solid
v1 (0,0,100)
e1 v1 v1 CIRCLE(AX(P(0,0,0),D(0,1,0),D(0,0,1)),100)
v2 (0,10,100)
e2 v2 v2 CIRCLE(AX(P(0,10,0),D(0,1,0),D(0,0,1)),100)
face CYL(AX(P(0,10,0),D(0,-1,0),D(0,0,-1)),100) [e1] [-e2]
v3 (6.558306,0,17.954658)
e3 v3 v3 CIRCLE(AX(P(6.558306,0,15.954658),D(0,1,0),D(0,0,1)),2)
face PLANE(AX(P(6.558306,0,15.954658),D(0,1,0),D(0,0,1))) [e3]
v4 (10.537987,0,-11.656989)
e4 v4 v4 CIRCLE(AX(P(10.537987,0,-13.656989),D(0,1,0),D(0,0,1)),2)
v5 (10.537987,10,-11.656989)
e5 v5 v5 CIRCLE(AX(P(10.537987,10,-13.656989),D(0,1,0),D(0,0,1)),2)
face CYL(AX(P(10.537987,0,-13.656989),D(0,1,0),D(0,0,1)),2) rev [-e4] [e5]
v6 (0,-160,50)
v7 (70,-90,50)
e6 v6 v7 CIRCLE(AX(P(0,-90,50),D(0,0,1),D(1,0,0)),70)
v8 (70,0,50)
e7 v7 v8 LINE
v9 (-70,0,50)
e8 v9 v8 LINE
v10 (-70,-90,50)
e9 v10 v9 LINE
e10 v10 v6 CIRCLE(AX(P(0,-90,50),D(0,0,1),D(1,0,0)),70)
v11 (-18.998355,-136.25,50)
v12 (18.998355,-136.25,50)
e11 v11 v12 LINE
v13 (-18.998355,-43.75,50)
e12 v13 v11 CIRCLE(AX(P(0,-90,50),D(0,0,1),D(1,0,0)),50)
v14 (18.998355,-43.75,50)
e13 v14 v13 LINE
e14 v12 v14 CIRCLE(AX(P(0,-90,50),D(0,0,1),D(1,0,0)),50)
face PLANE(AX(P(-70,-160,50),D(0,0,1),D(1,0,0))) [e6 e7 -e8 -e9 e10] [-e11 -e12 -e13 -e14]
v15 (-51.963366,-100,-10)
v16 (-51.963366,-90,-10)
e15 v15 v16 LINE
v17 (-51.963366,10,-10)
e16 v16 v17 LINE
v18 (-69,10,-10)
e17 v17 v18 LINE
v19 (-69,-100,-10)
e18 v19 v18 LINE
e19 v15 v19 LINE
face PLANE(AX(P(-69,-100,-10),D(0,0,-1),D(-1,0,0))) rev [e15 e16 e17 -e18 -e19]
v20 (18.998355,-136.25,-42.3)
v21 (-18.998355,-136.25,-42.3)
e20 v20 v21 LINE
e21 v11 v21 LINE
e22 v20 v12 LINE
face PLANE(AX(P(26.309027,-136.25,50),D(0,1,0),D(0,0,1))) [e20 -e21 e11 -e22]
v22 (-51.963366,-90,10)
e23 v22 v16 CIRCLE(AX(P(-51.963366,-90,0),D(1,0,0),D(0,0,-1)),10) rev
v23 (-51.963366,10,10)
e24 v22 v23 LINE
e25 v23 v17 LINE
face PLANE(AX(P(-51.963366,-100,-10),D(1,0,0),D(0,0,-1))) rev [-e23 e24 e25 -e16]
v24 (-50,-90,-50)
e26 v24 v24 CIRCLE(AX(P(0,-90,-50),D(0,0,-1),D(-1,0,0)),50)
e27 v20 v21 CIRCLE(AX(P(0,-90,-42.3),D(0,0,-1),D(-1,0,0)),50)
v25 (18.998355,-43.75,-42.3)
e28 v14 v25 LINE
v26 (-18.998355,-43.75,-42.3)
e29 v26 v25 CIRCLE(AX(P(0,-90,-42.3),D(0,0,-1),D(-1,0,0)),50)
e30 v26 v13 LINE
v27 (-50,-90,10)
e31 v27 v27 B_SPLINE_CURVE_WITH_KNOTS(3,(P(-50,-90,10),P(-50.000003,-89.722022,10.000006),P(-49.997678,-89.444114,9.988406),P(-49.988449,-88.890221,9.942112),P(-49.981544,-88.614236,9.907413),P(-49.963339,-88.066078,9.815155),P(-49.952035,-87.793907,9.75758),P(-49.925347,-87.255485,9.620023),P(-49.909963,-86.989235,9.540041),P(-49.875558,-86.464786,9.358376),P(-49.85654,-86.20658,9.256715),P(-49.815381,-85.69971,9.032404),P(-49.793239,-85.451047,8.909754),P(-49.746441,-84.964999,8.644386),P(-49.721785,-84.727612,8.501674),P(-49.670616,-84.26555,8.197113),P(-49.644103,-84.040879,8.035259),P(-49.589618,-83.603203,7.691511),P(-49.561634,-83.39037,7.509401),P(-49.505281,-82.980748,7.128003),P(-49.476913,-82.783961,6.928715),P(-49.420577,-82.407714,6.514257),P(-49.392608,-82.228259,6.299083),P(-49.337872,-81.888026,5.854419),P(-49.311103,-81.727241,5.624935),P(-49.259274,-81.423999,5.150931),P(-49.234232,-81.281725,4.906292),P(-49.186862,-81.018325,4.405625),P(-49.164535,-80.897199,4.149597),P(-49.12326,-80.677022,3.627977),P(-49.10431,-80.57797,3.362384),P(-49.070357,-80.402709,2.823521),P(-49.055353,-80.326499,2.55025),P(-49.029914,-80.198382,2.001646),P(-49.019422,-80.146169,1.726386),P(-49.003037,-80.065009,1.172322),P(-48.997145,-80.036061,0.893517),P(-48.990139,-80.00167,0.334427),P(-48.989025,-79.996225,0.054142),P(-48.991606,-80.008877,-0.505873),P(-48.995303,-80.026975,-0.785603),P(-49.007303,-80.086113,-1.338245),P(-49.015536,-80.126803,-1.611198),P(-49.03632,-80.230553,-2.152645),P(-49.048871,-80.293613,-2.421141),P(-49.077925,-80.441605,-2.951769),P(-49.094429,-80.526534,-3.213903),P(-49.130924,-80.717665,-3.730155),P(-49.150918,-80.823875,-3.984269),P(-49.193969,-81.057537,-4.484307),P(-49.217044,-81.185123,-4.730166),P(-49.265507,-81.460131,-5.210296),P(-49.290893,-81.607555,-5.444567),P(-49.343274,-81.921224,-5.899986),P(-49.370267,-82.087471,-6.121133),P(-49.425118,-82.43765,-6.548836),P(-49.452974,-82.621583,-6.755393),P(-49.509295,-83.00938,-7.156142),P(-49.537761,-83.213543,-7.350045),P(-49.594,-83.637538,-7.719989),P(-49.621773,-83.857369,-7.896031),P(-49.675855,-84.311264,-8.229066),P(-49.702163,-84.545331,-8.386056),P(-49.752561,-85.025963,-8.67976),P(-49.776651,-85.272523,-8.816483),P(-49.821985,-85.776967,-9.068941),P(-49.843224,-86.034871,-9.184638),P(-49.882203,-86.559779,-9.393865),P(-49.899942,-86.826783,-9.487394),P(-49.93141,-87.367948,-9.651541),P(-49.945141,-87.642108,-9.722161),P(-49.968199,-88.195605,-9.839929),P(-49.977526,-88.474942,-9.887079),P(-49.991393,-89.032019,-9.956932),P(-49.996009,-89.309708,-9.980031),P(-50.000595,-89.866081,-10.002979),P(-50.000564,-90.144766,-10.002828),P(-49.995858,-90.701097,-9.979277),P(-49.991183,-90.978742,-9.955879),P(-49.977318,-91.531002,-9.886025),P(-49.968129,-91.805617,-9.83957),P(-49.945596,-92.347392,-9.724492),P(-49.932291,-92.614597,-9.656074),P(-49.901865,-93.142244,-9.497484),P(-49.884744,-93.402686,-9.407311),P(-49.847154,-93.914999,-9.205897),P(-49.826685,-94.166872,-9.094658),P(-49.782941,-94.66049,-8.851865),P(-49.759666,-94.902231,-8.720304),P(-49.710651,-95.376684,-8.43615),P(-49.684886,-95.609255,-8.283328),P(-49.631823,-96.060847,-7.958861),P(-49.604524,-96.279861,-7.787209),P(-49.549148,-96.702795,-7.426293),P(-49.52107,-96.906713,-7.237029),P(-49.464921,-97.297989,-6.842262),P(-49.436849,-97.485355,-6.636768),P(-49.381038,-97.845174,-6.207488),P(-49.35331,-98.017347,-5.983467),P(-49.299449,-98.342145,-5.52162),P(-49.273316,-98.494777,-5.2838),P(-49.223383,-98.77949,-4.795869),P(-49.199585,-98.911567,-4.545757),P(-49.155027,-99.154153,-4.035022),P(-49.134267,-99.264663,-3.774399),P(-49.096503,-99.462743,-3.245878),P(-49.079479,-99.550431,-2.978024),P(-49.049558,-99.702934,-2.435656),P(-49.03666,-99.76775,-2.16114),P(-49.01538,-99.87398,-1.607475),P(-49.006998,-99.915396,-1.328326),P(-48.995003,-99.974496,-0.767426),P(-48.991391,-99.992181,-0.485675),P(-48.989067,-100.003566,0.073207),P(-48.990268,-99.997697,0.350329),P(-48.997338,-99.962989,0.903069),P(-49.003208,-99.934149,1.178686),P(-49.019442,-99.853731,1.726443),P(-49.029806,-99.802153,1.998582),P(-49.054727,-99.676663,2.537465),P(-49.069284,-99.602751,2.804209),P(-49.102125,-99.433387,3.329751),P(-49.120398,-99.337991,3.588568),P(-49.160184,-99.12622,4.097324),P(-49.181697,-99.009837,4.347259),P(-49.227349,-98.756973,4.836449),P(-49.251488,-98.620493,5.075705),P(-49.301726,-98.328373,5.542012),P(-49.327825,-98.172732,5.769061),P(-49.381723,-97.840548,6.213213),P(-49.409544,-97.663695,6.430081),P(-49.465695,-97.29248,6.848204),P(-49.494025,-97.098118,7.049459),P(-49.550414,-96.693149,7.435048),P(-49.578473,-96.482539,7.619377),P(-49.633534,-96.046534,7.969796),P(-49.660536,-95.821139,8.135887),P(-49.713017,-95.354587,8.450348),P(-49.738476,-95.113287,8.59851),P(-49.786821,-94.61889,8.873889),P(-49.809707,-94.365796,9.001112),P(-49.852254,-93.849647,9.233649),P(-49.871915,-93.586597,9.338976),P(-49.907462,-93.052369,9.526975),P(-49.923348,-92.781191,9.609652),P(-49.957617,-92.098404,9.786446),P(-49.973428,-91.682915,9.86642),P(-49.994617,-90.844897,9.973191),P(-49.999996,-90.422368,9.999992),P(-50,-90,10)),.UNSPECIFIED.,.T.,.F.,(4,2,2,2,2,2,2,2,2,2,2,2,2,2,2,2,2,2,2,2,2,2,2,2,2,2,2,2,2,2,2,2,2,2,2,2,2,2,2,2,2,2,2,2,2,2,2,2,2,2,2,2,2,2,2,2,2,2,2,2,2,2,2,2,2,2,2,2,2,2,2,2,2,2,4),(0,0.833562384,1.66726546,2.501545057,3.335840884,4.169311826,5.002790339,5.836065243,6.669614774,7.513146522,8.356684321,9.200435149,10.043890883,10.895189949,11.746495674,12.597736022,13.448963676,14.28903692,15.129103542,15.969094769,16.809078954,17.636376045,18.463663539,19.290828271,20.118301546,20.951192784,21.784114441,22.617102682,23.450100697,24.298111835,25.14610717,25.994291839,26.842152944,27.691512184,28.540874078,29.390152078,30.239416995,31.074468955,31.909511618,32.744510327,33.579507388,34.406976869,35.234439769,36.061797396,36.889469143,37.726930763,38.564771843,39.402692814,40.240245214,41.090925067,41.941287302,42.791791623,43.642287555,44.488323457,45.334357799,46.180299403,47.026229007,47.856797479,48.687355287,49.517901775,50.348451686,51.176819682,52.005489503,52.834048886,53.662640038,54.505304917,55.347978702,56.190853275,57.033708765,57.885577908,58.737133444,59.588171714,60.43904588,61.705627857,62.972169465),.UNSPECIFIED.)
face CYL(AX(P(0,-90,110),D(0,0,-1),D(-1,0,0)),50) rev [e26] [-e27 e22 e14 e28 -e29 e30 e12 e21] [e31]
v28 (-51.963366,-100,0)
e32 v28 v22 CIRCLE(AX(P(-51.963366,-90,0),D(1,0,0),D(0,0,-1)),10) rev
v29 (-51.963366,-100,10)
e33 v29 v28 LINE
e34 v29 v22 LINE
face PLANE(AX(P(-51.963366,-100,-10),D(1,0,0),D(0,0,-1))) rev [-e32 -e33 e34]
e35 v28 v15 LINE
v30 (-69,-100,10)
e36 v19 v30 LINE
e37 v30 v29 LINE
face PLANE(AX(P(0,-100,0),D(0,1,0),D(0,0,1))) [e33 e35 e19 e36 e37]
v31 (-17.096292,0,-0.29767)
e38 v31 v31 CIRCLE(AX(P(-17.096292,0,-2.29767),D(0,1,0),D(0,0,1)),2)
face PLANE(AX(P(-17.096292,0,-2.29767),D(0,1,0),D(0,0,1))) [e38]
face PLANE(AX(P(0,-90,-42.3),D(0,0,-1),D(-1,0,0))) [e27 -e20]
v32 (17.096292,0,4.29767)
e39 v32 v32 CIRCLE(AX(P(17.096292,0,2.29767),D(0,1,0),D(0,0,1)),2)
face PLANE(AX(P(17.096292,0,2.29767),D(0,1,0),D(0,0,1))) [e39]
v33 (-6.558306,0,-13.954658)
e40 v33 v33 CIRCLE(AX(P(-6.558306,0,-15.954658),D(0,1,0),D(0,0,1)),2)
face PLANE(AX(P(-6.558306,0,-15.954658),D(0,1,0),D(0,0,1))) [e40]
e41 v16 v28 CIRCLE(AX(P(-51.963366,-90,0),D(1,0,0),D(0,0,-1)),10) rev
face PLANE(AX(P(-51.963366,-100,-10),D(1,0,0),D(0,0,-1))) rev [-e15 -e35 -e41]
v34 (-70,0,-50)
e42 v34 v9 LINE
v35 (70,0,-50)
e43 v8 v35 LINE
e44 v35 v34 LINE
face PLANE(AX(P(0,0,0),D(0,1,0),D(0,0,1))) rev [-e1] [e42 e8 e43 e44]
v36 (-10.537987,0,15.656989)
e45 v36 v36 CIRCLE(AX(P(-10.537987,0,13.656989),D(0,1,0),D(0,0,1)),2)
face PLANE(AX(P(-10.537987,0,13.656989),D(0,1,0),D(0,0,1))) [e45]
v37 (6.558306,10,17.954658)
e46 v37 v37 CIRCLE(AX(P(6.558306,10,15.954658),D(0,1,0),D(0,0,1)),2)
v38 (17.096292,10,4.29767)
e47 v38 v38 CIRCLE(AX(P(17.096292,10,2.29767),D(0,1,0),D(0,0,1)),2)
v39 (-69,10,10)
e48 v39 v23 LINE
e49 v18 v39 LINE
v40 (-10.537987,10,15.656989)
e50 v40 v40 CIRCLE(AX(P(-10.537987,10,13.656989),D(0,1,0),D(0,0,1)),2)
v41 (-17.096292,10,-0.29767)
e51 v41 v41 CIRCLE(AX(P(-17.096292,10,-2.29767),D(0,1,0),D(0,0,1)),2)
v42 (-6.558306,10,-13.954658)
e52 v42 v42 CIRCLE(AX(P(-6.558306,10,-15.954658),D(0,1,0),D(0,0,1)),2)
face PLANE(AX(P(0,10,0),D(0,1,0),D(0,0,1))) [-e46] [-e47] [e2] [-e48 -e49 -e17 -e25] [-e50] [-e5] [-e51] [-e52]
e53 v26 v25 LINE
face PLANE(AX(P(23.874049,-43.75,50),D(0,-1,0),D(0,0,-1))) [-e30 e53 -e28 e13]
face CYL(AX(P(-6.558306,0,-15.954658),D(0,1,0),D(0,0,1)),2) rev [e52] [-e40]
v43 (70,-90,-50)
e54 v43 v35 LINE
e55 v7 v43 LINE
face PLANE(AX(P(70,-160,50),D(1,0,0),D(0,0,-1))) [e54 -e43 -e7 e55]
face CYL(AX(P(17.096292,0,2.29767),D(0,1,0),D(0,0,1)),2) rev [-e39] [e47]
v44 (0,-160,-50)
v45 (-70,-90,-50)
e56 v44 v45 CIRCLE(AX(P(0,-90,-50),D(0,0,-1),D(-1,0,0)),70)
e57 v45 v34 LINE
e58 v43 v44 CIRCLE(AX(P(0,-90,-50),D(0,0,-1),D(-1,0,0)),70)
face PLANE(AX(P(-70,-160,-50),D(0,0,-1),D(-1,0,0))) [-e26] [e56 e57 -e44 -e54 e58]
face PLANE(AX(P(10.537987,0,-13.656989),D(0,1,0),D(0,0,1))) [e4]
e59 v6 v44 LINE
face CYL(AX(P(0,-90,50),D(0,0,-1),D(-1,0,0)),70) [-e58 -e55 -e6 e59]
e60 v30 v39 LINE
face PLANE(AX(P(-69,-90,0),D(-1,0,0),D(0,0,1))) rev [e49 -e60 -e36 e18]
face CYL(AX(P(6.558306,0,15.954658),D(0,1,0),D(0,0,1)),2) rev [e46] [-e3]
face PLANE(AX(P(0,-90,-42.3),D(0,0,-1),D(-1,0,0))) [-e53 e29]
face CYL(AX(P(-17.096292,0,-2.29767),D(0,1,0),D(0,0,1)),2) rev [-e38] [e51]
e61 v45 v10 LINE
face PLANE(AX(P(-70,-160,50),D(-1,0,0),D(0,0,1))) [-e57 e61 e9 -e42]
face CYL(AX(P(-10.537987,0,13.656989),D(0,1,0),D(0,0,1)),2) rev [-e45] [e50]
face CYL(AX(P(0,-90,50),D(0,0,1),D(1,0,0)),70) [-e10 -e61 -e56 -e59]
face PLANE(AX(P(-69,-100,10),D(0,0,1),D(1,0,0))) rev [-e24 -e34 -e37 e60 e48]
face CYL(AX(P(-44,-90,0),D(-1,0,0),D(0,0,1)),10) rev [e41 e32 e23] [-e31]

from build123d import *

# Parameters (mm, degrees)
SKETCH_1_R          = 100
EXTRUDE_1_DEPTH     = 10
SKETCH_2_W          = 140
SKETCH_2_H          = 100
EXTRUDE_2_DEPTH     = 160.00000000000009
FILLET_1_R          = 70
FILLET_2_R          = 70
SKETCH_3_R          = 50
CUT_EXTRUDE_1_DEPTH = 160.00000000000009
CUT_EXTRUDE_START   = -1
SKETCH_13_R         = 9.999999999999998
CUT_EXTRUDE_5_DEPTH = 25
SKETCH_9_W          = 53.30531277978001
SKETCH_9_H          = 9.28529014360771
EXTRUDE_3_DEPTH     = 100
SKETCH_14_R         = 50
CUT_EXTRUDE_6_DEPTH = 7.7
SKETCH_15_W         = 17.036633895131082
SKETCH_15_H         = 20
CUT_EXTRUDE_7_DEPTH = 110.00000000000001
SKETCH_16_R         = 2.0000000000000036
SKETCH_16_R_2       = 2.000000000000005
SKETCH_16_R_3       = 2.0000000000000013
SKETCH_16_R_4       = 2.0000000000000027
SKETCH_16_R_5       = 2.0000000000000044
CUT_EXTRUDE_8_DEPTH = 10


with BuildPart() as part:
    # 草图1 → 凸台-拉伸1 (new body)
    with BuildSketch(Plane(origin=(0, 0, 0), x_dir=(1, 0, 0), z_dir=(0, 1, 0))):
        with Locations(Location((0, 0, 0), (0, 0, 270))):
            Circle(SKETCH_1_R)
    extrude(amount=EXTRUDE_1_DEPTH)

    # 草图2 → 凸台-拉伸2 (add)
    with BuildSketch(Plane(origin=(0, 0, 0), x_dir=(1, 0, 0), z_dir=(0, 1, 0))):
        Rectangle(SKETCH_2_W, SKETCH_2_H)
    extrude(amount=-EXTRUDE_2_DEPTH)

    # 圆角1
    fillet_1_edges = [part.edges().sort_by_distance(p)[0] for p in [
        (-70.00000000000001, -160.00000000000009, 7.11e-15),
    ]]
    fillet(fillet_1_edges, radius=FILLET_1_R)

    # 圆角2
    fillet_2_edges = [part.edges().sort_by_distance(p)[0] for p in [
        (69.99999999999999, -160.00000000000009, 7.11e-15),
    ]]
    fillet(fillet_2_edges, radius=FILLET_2_R - 0.0001)  # a hair under: the kernel refuses the full size

    # 草图3 → 切除-拉伸1 (cut)
    with BuildSketch(Plane(origin=(0, 0, -49.99999999999999), x_dir=(-1, 0, 0), z_dir=(0, 0, -1))):
        with Locations((0, -90)):
            Circle(SKETCH_3_R)
    extrude(amount=-CUT_EXTRUDE_1_DEPTH, mode=Mode.SUBTRACT)

    # 草图13 → 切除-拉伸5 (cut)
    with BuildSketch(Plane.ZY.offset(70.00000000000001).offset(CUT_EXTRUDE_START)):
        with Locations((6.94e-15, -90.00000000000009)):
            Circle(SKETCH_13_R)
    extrude(amount=-CUT_EXTRUDE_5_DEPTH, mode=Mode.SUBTRACT)

    # 草图9 → 凸台-拉伸3 (add)
    with BuildSketch(Plane(origin=(0, 0, -49.99999999999999), x_dir=(-1, 0, 0), z_dir=(0, 0, -1))):
        with Locations((0.3436291461197136, -140.89264507180383)):
            Rectangle(SKETCH_9_W, SKETCH_9_H)
        Polygon((-23.87404930056264, -43.75), (22.298543315194763, -43.75), (22.298543315194763, -37.81707315136096), (-23.87404930056264, -37.817073151360965), align=None)
    extrude(amount=-EXTRUDE_3_DEPTH)

    # 草图14 → 切除-拉伸6 (cut)
    with BuildSketch(Plane(origin=(0, 0, -49.99999999999999), x_dir=(-1, 0, 0), z_dir=(0, 0, -1))):
        with Locations((0, -90)):
            Circle(SKETCH_14_R)
    extrude(amount=-CUT_EXTRUDE_6_DEPTH, mode=Mode.SUBTRACT)

    # 草图15 → 切除-拉伸7 (cut)
    with BuildSketch(Plane(origin=(0, 10, 0), x_dir=(1, 0, 0), z_dir=(0, 1, 0))):
        with Locations((-60.48168305243448, -7.11e-15)):
            Rectangle(SKETCH_15_W, SKETCH_15_H)
    extrude(amount=-CUT_EXTRUDE_7_DEPTH, mode=Mode.SUBTRACT)

    # 草图16 → 切除-拉伸8 (cut)
    with BuildSketch(Plane(origin=(0, 10, 0), x_dir=(1, 0, 0), z_dir=(0, 1, 0))):
        with Locations(Location((10.537986720028217, 13.656988536588477, 0), (0, 0, 270))):
            Circle(SKETCH_16_R)
        with Locations(Location((17.09629237189259, -2.2976699359932877, 0), (0, 0, 270))):
            Circle(SKETCH_16_R_2)
        with Locations(Location((6.558305651864305, -15.954658472581762, 0), (0, 0, 270))):
            Circle(SKETCH_16_R_3)
        with Locations(Location((-10.537986720028309, -13.656988536588404, 0), (0, 0, 270))):
            Circle(SKETCH_16_R_4)
        with Locations(Location((-17.09629237189257, 2.2976699359934125, 0), (0, 0, 270))):
            Circle(SKETCH_16_R_4)
        with Locations(Location((-6.558305651864193, 15.954658472581803, 0), (0, 0, 270))):
            Circle(SKETCH_16_R_5)
    extrude(amount=-CUT_EXTRUDE_8_DEPTH, mode=Mode.SUBTRACT)


solid = part.part
